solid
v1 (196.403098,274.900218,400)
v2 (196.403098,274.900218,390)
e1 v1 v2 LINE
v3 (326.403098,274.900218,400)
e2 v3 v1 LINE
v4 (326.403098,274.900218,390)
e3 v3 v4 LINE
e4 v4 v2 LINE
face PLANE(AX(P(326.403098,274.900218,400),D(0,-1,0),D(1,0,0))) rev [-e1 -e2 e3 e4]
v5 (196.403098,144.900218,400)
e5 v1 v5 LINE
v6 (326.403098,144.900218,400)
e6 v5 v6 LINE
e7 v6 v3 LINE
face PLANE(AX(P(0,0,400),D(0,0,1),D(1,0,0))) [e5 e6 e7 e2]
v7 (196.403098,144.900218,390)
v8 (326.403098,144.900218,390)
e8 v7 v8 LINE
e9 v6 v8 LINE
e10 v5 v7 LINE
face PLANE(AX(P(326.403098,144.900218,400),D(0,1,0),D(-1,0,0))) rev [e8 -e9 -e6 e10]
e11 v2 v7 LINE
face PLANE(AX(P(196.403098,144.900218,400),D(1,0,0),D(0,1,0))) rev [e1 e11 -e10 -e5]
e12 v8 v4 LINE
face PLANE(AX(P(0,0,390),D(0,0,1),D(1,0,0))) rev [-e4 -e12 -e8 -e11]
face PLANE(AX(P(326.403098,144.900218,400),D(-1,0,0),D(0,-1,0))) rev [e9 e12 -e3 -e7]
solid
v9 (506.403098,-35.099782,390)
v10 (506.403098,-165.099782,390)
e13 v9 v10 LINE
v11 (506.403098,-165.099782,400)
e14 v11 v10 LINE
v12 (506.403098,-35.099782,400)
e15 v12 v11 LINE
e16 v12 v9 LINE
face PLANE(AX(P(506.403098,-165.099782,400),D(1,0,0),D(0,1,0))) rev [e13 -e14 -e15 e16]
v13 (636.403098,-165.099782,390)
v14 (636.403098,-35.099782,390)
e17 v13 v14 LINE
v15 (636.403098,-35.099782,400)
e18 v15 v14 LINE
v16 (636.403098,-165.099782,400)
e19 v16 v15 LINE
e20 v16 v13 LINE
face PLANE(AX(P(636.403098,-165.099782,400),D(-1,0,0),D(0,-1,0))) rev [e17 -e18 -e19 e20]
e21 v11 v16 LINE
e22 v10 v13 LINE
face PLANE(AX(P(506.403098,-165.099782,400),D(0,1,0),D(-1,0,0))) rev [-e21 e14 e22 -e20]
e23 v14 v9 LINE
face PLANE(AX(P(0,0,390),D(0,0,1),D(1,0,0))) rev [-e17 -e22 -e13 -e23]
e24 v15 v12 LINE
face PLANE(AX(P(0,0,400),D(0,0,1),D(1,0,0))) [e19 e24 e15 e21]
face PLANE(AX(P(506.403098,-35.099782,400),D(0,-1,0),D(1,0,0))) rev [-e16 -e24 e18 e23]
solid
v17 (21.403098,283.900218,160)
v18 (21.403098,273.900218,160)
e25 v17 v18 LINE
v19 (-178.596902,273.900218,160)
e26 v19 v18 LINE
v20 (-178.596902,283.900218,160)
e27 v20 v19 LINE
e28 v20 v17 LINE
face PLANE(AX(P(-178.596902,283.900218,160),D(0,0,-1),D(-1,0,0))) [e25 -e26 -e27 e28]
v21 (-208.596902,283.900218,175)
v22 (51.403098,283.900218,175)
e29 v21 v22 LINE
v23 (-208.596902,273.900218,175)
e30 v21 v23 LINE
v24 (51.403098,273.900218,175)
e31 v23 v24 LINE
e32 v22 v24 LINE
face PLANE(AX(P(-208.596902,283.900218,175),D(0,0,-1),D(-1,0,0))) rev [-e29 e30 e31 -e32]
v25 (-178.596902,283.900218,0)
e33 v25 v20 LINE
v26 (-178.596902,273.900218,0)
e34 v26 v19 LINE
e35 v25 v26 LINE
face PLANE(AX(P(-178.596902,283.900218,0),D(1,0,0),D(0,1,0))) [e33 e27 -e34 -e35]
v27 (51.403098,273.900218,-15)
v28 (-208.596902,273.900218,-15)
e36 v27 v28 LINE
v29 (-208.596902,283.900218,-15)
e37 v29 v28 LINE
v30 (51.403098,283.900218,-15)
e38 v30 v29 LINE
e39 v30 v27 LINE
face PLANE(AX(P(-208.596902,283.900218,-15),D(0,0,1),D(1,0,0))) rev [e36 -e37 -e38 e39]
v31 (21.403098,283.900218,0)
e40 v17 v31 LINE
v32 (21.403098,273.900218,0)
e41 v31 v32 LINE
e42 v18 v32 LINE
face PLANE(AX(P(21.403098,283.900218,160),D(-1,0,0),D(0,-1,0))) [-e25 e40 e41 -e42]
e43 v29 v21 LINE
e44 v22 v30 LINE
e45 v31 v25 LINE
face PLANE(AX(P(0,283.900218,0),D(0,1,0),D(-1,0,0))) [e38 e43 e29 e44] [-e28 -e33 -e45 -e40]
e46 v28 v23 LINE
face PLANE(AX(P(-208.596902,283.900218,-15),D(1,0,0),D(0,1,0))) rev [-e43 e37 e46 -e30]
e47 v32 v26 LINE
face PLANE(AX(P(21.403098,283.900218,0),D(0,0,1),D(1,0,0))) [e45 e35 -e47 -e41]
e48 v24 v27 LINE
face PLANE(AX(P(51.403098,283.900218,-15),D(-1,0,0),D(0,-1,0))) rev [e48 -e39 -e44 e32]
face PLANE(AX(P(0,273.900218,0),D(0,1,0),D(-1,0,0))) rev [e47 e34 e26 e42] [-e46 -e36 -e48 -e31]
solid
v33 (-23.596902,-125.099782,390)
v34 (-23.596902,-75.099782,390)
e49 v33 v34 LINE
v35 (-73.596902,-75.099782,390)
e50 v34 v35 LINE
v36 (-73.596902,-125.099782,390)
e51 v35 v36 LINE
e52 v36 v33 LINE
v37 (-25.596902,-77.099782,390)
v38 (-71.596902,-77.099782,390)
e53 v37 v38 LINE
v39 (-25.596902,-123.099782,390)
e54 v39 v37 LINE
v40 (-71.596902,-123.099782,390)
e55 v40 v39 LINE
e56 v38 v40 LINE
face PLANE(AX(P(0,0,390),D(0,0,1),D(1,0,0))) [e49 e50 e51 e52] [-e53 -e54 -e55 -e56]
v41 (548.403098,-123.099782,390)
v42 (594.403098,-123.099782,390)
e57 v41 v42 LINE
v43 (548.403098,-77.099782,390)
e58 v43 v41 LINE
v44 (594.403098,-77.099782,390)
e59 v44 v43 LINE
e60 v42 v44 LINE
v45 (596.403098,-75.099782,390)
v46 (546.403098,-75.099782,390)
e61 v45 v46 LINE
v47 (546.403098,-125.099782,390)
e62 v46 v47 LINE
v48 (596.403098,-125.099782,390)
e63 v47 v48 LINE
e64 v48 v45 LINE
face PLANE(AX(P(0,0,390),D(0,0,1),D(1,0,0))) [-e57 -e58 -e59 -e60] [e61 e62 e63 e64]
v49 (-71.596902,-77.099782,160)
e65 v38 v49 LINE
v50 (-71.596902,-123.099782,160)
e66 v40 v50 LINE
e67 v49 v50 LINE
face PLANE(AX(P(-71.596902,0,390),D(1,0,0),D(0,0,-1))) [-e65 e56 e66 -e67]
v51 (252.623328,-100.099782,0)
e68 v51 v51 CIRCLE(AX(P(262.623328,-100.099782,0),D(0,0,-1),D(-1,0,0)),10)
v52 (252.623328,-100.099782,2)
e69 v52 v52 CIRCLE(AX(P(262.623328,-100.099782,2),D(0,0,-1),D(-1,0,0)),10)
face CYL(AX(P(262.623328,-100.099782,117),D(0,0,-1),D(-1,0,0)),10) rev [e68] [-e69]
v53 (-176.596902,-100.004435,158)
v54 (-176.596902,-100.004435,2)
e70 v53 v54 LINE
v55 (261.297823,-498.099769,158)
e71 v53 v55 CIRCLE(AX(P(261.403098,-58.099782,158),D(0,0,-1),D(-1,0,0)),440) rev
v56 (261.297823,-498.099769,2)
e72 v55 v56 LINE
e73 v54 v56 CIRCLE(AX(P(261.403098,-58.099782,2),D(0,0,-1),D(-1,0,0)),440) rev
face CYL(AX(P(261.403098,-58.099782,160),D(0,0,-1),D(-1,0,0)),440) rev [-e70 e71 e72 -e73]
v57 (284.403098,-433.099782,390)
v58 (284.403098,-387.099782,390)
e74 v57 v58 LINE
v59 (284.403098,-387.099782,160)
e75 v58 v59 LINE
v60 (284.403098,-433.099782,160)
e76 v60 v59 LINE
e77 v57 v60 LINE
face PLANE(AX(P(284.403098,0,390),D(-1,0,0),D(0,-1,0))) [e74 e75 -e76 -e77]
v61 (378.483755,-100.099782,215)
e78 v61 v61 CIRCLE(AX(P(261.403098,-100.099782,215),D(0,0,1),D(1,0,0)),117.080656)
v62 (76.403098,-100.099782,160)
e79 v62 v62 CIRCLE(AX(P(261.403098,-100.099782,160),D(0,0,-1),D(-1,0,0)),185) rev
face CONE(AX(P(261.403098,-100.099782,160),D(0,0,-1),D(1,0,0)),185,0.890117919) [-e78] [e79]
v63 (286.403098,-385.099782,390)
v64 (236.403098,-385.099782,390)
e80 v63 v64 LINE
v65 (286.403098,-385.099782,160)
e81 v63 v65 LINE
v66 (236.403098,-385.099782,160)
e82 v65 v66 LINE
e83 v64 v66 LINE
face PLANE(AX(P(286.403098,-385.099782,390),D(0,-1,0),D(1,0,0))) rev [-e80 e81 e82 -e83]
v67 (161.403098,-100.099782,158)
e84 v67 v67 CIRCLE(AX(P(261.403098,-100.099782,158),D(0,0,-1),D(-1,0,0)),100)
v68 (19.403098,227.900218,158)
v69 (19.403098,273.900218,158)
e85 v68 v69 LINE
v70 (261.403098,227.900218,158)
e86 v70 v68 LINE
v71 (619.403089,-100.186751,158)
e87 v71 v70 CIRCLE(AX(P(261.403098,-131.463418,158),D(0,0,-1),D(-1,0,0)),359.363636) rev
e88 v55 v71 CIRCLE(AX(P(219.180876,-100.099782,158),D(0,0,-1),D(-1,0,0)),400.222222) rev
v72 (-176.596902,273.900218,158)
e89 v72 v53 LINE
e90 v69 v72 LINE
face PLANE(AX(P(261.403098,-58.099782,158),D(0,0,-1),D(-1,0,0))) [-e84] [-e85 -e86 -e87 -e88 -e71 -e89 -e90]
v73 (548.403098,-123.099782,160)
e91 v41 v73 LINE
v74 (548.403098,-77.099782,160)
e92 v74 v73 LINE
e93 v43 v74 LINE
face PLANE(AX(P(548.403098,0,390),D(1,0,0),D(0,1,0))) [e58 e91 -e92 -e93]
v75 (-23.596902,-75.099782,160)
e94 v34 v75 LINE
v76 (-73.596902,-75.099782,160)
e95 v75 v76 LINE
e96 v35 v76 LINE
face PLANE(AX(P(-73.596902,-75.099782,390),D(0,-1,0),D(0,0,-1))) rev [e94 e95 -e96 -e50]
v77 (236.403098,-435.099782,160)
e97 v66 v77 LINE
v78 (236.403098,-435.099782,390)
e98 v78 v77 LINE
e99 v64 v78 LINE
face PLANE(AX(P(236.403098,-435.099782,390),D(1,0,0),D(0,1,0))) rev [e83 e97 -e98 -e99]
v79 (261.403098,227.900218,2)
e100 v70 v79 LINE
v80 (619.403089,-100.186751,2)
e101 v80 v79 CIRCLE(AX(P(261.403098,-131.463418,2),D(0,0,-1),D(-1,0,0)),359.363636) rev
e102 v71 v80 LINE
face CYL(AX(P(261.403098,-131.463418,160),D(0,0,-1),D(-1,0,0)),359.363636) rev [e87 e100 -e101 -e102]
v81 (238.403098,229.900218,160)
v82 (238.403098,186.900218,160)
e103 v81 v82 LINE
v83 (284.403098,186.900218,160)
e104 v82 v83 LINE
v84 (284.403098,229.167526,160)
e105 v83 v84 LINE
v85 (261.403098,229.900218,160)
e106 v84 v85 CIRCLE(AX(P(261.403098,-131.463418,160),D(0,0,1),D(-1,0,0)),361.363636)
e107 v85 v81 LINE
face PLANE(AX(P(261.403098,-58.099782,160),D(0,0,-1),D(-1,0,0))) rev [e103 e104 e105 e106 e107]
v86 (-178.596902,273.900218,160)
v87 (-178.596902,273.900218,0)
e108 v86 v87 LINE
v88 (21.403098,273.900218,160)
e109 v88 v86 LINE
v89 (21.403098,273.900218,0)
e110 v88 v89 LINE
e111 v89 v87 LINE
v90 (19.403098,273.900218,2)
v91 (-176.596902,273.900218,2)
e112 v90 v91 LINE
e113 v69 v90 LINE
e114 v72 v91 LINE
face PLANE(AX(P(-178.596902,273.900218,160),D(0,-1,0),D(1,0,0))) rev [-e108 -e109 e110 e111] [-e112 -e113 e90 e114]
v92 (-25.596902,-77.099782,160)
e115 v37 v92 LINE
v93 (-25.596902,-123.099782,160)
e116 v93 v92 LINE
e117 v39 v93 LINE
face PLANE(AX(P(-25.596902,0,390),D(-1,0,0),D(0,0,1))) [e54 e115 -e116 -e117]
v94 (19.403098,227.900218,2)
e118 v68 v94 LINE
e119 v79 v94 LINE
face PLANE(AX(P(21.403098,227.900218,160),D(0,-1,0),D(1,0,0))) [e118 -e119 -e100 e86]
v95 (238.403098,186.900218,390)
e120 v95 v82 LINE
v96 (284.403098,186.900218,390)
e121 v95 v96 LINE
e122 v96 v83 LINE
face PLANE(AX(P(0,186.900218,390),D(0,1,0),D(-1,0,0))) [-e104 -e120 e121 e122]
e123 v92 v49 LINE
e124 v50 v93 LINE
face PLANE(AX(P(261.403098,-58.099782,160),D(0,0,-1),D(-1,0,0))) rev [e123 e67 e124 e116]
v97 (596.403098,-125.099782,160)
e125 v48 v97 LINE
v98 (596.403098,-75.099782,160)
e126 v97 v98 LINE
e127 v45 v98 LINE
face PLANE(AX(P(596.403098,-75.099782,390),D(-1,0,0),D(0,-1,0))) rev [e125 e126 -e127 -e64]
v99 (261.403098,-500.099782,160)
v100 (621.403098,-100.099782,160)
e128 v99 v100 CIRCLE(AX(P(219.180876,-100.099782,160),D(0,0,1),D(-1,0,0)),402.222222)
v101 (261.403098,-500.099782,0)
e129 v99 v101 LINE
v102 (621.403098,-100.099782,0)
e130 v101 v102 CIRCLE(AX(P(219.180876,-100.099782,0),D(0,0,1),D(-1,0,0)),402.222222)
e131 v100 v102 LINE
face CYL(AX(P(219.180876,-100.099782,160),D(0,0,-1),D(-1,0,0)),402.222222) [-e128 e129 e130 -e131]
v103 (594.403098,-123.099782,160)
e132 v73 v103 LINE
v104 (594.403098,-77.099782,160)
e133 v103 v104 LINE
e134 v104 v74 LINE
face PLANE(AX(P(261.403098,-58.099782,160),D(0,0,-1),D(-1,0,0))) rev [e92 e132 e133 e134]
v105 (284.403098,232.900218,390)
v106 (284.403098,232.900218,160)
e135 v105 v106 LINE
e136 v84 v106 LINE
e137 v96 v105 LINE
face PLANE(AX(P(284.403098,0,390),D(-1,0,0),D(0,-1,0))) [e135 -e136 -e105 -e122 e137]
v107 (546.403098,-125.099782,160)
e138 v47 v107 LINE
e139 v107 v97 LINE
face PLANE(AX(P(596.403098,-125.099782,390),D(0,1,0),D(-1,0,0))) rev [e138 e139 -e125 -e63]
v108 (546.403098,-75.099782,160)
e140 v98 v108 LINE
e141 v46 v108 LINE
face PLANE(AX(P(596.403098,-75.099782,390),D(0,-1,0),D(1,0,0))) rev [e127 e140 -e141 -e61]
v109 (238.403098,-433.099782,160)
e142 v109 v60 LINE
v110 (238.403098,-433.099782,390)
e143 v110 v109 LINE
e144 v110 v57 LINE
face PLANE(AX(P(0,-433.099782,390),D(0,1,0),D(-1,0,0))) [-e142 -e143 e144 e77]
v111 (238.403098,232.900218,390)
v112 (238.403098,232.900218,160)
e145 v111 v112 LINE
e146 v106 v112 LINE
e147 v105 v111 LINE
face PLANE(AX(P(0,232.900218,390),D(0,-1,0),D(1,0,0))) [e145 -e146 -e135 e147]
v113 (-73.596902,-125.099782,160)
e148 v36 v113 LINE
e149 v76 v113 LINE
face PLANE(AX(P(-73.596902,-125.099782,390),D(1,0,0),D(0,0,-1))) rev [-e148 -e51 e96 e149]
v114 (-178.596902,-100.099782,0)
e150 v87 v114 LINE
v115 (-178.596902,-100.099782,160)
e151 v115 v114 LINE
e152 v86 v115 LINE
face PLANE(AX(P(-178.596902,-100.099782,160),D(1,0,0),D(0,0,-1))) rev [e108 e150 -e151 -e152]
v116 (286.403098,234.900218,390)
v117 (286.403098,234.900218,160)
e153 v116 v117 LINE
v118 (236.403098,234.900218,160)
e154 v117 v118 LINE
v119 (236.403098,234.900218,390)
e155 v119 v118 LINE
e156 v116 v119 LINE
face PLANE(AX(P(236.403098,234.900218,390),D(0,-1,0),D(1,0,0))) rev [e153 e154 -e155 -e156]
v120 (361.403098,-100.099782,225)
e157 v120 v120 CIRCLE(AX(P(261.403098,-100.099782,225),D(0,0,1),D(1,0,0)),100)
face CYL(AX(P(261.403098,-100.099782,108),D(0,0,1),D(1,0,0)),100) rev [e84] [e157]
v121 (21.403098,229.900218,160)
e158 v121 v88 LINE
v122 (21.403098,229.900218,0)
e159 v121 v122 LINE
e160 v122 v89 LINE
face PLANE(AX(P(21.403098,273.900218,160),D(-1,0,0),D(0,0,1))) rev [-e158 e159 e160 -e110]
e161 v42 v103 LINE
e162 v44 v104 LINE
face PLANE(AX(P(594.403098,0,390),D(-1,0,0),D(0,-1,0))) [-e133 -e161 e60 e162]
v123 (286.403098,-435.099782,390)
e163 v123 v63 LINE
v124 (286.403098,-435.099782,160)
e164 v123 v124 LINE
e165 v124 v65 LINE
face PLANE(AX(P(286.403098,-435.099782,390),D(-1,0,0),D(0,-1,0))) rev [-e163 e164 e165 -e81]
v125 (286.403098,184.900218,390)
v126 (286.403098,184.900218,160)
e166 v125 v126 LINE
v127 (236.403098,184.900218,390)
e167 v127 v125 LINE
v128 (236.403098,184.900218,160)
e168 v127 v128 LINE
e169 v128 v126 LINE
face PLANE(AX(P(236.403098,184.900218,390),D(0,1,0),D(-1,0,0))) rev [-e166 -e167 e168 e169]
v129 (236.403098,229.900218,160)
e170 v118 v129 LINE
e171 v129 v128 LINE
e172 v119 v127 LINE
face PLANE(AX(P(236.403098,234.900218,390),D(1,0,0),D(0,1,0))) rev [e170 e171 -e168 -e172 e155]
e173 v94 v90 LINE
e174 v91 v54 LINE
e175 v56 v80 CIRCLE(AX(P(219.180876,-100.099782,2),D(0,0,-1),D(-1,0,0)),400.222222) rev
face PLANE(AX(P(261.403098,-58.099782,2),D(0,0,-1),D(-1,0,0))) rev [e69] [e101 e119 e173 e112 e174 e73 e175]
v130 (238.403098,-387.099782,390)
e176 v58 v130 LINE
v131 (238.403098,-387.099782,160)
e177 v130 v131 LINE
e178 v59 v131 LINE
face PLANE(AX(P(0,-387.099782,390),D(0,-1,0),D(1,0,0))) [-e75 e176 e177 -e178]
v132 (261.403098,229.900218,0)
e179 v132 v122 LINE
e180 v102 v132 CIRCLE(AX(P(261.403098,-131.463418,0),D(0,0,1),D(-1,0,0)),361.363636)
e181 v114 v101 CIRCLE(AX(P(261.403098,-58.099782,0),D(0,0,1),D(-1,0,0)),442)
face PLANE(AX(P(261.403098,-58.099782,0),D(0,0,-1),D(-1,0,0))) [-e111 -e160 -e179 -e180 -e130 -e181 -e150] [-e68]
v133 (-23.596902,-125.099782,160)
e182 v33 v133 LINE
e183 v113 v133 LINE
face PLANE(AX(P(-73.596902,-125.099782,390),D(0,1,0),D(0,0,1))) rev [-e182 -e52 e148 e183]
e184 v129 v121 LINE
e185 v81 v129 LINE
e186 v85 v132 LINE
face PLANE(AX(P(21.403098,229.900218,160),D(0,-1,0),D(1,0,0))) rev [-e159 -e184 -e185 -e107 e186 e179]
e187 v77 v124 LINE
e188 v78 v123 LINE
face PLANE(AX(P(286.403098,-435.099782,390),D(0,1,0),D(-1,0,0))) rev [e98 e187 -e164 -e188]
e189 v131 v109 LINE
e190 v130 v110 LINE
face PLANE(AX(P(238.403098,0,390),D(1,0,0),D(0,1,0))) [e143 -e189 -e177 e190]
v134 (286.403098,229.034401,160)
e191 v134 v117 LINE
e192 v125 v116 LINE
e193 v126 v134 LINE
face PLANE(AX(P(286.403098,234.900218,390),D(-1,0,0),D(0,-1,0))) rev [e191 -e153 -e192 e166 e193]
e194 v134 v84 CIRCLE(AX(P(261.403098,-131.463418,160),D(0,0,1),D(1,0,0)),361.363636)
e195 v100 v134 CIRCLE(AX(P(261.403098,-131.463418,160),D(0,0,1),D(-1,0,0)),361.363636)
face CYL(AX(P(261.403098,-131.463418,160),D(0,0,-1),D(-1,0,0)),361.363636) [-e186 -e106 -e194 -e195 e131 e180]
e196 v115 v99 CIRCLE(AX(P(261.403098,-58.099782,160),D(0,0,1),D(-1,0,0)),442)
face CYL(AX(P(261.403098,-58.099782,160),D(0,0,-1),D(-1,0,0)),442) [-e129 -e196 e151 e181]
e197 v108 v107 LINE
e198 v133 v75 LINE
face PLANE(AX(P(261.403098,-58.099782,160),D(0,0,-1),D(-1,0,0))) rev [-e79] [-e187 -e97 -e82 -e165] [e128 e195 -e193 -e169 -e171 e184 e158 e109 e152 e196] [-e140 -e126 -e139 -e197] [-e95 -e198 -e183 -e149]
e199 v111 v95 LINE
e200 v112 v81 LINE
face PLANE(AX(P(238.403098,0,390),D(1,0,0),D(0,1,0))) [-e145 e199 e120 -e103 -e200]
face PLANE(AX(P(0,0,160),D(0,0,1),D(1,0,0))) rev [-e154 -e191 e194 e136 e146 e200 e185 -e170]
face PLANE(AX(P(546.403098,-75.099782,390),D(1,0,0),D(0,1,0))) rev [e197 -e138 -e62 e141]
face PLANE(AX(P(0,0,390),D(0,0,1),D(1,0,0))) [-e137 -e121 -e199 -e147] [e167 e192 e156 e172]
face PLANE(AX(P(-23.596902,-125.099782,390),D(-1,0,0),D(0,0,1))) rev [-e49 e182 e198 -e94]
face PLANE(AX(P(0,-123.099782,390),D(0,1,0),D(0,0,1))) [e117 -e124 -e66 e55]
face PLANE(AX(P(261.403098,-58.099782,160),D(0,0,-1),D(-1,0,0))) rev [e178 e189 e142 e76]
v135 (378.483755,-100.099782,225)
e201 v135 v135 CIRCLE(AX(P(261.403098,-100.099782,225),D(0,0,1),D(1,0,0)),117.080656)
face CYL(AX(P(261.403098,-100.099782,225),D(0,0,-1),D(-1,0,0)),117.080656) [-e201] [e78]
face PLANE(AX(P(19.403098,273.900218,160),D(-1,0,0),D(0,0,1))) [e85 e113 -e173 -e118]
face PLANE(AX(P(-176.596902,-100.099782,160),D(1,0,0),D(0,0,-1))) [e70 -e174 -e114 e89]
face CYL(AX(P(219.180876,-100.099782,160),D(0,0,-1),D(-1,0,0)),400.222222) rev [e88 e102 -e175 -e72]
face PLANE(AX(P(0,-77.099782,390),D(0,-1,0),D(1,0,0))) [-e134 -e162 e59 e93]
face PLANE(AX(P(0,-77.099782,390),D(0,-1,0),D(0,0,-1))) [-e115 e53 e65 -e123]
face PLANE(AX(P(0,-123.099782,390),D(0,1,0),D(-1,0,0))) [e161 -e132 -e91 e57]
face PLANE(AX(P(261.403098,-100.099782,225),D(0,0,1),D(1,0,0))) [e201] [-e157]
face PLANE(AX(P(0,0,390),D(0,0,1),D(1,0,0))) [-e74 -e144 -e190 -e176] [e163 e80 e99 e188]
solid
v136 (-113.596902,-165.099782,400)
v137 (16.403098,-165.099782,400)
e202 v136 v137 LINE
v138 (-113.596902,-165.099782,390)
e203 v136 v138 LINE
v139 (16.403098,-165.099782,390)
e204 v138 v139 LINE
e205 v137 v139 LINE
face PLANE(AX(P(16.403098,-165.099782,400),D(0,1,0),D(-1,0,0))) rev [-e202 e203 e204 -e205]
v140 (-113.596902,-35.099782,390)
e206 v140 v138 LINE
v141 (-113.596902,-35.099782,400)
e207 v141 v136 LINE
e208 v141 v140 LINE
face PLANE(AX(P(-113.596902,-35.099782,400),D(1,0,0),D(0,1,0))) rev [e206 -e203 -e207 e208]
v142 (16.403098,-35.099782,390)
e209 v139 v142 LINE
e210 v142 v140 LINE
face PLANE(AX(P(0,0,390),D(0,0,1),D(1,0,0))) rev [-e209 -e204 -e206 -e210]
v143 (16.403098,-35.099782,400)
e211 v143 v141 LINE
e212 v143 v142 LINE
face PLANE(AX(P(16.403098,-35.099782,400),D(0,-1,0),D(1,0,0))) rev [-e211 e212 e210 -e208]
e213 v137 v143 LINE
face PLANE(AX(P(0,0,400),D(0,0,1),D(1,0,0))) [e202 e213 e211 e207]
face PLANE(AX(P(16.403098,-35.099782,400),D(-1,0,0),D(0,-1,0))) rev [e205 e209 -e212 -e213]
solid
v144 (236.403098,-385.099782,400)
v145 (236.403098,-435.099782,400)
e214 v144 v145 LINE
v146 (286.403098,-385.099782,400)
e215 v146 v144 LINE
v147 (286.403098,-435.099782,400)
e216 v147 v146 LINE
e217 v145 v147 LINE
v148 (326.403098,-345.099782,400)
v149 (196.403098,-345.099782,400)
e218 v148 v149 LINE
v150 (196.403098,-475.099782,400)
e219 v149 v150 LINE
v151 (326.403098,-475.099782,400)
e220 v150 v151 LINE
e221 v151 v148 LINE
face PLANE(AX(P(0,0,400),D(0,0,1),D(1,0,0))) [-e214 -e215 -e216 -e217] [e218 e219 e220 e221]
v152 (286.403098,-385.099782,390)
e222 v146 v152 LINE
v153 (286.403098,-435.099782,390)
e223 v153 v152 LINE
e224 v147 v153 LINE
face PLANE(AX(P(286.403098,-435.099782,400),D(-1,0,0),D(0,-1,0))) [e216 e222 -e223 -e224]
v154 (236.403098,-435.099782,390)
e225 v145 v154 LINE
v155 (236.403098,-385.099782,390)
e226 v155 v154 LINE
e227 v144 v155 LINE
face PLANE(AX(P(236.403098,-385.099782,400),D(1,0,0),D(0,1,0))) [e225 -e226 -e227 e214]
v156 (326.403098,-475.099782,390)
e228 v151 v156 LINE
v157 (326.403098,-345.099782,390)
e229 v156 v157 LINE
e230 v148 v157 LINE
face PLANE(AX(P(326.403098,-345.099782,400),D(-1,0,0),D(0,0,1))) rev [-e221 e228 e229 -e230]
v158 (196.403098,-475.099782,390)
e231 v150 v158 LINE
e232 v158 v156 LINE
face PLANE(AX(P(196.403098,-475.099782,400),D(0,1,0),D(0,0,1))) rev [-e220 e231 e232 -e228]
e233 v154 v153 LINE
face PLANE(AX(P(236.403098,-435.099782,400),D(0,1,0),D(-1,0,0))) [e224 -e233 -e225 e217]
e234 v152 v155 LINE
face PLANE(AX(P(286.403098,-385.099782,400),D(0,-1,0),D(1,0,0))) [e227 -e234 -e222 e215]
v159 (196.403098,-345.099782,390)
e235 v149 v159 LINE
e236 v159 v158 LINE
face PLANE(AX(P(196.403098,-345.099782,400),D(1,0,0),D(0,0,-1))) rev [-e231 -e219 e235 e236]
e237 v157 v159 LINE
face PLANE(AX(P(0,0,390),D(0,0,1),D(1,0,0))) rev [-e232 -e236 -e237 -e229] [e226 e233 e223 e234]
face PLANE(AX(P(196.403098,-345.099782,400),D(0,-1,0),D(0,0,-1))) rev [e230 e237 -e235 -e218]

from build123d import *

# Parameters (mm, degrees)
BOSS_EXTRUDE1_DEPTH       = 160
SHELL1_START              = 2
SHELL1_DEPTH              = 156
SKETCH4_R                 = 90
CUT_EXTRUDE1_DEPTH        = 54
SKETCH5_R                 = 185
BOSS_EXTRUDE2_DEPTH       = 55
BOSS_EXTRUDE2_TAPER       = 51
SKETCH6_R                 = 117.080656391
BOSS_EXTRUDE3_DEPTH       = 10
SKETCH7_R                 = 100
CUT_EXTRUDE2_DEPTH        = 117
SKETCH8_R                 = 10
CUT_EXTRUDE3_DEPTH        = 117
SKETCH11_W                = 260
SKETCH11_H                = 190
SKETCH11_W_2              = 200
SKETCH11_H_2              = 160
BOSS_EXTRUDE5_DEPTH       = 10
EXTRUDE_THIN1_OUTLINE_W   = 50
EXTRUDE_THIN1_OUTLINE_H   = 50
EXTRUDE_THIN1_OUTLINE_W_2 = 46
EXTRUDE_THIN1_OUTLINE_H_2 = 46
EXTRUDE_THIN1_DEPTH       = 230
SKETCH16_W                = 130
SKETCH16_H                = 130
BOSS_EXTRUDE6_DEPTH       = 10
SKETCH16_W_2              = 50
SKETCH16_H_2              = 50
BOSS_EXTRUDE6_2_DEPTH     = 10
BOSS_EXTRUDE6_3_DEPTH     = 10
BOSS_EXTRUDE6_4_DEPTH     = 10


# Read off the part's stored shape, not the designer's step: Shell1, Extrude-Thin1
with BuildPart() as part:
    # Sketch2 → Boss-Extrude1 (new body)
    with BuildSketch(Plane.XY):
        with BuildLine():
            Line((-178.596901506, -100.099781817), (-178.596901506, 273.900218183))
            Line((-178.596901506, 273.900218183), (21.403098494, 273.900218183))
            Line((21.403098494, 273.900218183), (21.403098494, 229.900218183))
            Line((21.403098494, 229.900218183), (261.403098494, 229.900218183))
            ThreePointArc((261.403098494, 229.900218183), (505.585407435, 134.917282483), (621.403098494, -100.099781817))
            ThreePointArc((621.403098494, -100.099781817), (518.15029954, -369.172262759), (261.403098494, -500.099781817))
            ThreePointArc((261.403098494, -500.099781817), (-35.918276453, -385.153294258), (-178.596901506, -100.099781817))
        make_face()
    extrude(amount=BOSS_EXTRUDE1_DEPTH)

    # Shell1 outline → Shell1 (cut)
    with BuildSketch(Plane.XY.offset(SHELL1_START)):
        with BuildLine():
            ThreePointArc((-176.596901506, -100.004435497), (-34.576684312, -383.670001847), (261.297822808, -498.099769223))
            ThreePointArc((261.297822808, -498.099769223), (516.669826437, -367.827538484), (619.403089044, -100.18675106))
            ThreePointArc((619.403089044, -100.18675106), (504.20191059, 133.472347591), (261.403098494, 227.900218183))
            Line((261.403098494, 227.900218183), (19.403098494, 227.900218183))
            Line((19.403098494, 227.900218183), (19.403098494, 273.900218183))
            Line((19.403098494, 273.900218183), (-176.596901506, 273.900218183))
            Line((-176.596901506, 273.900218183), (-176.596901506, -100.004435497))
        make_face()
    extrude(amount=SHELL1_DEPTH, mode=Mode.SUBTRACT)

    # Sketch4 → Cut-Extrude1 (cut)
    with BuildSketch(Plane.XY.offset(160)):
        with Locations((261.403098494, -100.099781817)):
            Circle(SKETCH4_R)
    extrude(amount=-CUT_EXTRUDE1_DEPTH, mode=Mode.SUBTRACT)

    # Sketch5 → Boss-Extrude2 (add)
    with BuildSketch(Plane.XY.offset(160)):
        with Locations((261.403098494, -100.099781817)):
            Circle(SKETCH5_R)
    extrude(amount=BOSS_EXTRUDE2_DEPTH, taper=BOSS_EXTRUDE2_TAPER)

    # Sketch6 → Boss-Extrude3 (add)
    with BuildSketch(Plane.XY.offset(215)):
        with Locations((261.403098494, -100.099781817)):
            Circle(SKETCH6_R)
    extrude(amount=BOSS_EXTRUDE3_DEPTH)

    # Sketch7 → Cut-Extrude2 (cut)
    with BuildSketch(Plane.XY.offset(225)):
        with Locations((261.403098494, -100.099781817)):
            Circle(SKETCH7_R)
    extrude(amount=-CUT_EXTRUDE2_DEPTH, mode=Mode.SUBTRACT)

    # Sketch8 → Cut-Extrude3 (cut)
    with BuildSketch(Plane(origin=(0, 0, 0), x_dir=(-1, 0, 0), z_dir=(0, 0, -1))):
        with Locations((-262.623327997, -100.099781817)):
            Circle(SKETCH8_R)
    extrude(amount=-CUT_EXTRUDE3_DEPTH, mode=Mode.SUBTRACT)

    # Extrude-Thin1 outline → Extrude-Thin1 (add)
    # profile 1 of 4: a face of its own
    with BuildSketch(Plane.XY.offset(160)):
        with Locations((-48.596901506, -100.099781817)):
            Rectangle(EXTRUDE_THIN1_OUTLINE_W, EXTRUDE_THIN1_OUTLINE_H)
        with Locations((-48.596901506, -100.099781817)):
            Rectangle(EXTRUDE_THIN1_OUTLINE_W_2, EXTRUDE_THIN1_OUTLINE_H_2, mode=Mode.SUBTRACT)
    # profile 2 of 4: a face of its own
    with BuildSketch(Plane.XY.offset(160)):
        with Locations((571.403098494, -100.099781817)):
            Rectangle(EXTRUDE_THIN1_OUTLINE_W, EXTRUDE_THIN1_OUTLINE_H)
        with Locations((571.403098494, -100.099781817)):
            Rectangle(EXTRUDE_THIN1_OUTLINE_W_2, EXTRUDE_THIN1_OUTLINE_H_2, mode=Mode.SUBTRACT)
    # profile 3 of 4: a face of its own
    with BuildSketch(Plane.XY.offset(160)):
        with Locations((261.403098494, 209.900218183)):
            Rectangle(EXTRUDE_THIN1_OUTLINE_W, EXTRUDE_THIN1_OUTLINE_H)
        with Locations((261.403098494, 209.900218183)):
            Rectangle(EXTRUDE_THIN1_OUTLINE_W_2, EXTRUDE_THIN1_OUTLINE_H_2, mode=Mode.SUBTRACT)
    # profile 4 of 4: a face of its own
    with BuildSketch(Plane.XY.offset(160)):
        with Locations((261.403098494, -410.099781817)):
            Rectangle(EXTRUDE_THIN1_OUTLINE_W, EXTRUDE_THIN1_OUTLINE_H)
        with Locations((261.403098494, -410.099781817)):
            Rectangle(EXTRUDE_THIN1_OUTLINE_W_2, EXTRUDE_THIN1_OUTLINE_H_2, mode=Mode.SUBTRACT)
    extrude(amount=EXTRUDE_THIN1_DEPTH)


with BuildPart() as body_2:
    # Sketch11 → Boss-Extrude5 (new body)
    with BuildSketch(Plane(origin=(0, 273.900218183, 0), x_dir=(1, 0, 0), z_dir=(0, 1, 0))):
        with Locations((-78.596901506, -80)):
            Rectangle(SKETCH11_W, SKETCH11_H)
        with Locations((-78.596901506, -80)):
            Rectangle(SKETCH11_W_2, SKETCH11_H_2, mode=Mode.SUBTRACT)
    extrude(amount=BOSS_EXTRUDE5_DEPTH)


with BuildPart() as body_3:
    # Sketch16 → Boss-Extrude6 (new body)
    with BuildSketch(Plane.XY.offset(390)):
        with Locations((-48.596901506, -100.099781817)):
            Rectangle(SKETCH16_W, SKETCH16_H)
    extrude(amount=BOSS_EXTRUDE6_DEPTH)


with BuildPart() as body_4:
    # Sketch16 → Boss-Extrude6 2 (new body)
    with BuildSketch(Plane.XY.offset(390)):
        with Locations((261.403098494, -410.099781817)):
            Rectangle(SKETCH16_W, SKETCH16_H)
        with Locations((261.403098494, -410.099781817)):
            Rectangle(SKETCH16_W_2, SKETCH16_H_2, mode=Mode.SUBTRACT)
    extrude(amount=BOSS_EXTRUDE6_2_DEPTH)


with BuildPart() as body_5:
    # Sketch16 → Boss-Extrude6 3 (new body)
    with BuildSketch(Plane.XY.offset(390)):
        with Locations((261.403098494, 209.900218183)):
            Rectangle(SKETCH16_W, SKETCH16_H)
    extrude(amount=BOSS_EXTRUDE6_3_DEPTH)


with BuildPart() as body_6:
    # Sketch16 → Boss-Extrude6 4 (new body)
    with BuildSketch(Plane.XY.offset(390)):
        with Locations((571.403098494, -100.099781817)):
            Rectangle(SKETCH16_W, SKETCH16_H)
    extrude(amount=BOSS_EXTRUDE6_4_DEPTH)


solid = Compound([part.part, body_2.part, body_3.part, body_4.part, body_5.part, body_6.part])
